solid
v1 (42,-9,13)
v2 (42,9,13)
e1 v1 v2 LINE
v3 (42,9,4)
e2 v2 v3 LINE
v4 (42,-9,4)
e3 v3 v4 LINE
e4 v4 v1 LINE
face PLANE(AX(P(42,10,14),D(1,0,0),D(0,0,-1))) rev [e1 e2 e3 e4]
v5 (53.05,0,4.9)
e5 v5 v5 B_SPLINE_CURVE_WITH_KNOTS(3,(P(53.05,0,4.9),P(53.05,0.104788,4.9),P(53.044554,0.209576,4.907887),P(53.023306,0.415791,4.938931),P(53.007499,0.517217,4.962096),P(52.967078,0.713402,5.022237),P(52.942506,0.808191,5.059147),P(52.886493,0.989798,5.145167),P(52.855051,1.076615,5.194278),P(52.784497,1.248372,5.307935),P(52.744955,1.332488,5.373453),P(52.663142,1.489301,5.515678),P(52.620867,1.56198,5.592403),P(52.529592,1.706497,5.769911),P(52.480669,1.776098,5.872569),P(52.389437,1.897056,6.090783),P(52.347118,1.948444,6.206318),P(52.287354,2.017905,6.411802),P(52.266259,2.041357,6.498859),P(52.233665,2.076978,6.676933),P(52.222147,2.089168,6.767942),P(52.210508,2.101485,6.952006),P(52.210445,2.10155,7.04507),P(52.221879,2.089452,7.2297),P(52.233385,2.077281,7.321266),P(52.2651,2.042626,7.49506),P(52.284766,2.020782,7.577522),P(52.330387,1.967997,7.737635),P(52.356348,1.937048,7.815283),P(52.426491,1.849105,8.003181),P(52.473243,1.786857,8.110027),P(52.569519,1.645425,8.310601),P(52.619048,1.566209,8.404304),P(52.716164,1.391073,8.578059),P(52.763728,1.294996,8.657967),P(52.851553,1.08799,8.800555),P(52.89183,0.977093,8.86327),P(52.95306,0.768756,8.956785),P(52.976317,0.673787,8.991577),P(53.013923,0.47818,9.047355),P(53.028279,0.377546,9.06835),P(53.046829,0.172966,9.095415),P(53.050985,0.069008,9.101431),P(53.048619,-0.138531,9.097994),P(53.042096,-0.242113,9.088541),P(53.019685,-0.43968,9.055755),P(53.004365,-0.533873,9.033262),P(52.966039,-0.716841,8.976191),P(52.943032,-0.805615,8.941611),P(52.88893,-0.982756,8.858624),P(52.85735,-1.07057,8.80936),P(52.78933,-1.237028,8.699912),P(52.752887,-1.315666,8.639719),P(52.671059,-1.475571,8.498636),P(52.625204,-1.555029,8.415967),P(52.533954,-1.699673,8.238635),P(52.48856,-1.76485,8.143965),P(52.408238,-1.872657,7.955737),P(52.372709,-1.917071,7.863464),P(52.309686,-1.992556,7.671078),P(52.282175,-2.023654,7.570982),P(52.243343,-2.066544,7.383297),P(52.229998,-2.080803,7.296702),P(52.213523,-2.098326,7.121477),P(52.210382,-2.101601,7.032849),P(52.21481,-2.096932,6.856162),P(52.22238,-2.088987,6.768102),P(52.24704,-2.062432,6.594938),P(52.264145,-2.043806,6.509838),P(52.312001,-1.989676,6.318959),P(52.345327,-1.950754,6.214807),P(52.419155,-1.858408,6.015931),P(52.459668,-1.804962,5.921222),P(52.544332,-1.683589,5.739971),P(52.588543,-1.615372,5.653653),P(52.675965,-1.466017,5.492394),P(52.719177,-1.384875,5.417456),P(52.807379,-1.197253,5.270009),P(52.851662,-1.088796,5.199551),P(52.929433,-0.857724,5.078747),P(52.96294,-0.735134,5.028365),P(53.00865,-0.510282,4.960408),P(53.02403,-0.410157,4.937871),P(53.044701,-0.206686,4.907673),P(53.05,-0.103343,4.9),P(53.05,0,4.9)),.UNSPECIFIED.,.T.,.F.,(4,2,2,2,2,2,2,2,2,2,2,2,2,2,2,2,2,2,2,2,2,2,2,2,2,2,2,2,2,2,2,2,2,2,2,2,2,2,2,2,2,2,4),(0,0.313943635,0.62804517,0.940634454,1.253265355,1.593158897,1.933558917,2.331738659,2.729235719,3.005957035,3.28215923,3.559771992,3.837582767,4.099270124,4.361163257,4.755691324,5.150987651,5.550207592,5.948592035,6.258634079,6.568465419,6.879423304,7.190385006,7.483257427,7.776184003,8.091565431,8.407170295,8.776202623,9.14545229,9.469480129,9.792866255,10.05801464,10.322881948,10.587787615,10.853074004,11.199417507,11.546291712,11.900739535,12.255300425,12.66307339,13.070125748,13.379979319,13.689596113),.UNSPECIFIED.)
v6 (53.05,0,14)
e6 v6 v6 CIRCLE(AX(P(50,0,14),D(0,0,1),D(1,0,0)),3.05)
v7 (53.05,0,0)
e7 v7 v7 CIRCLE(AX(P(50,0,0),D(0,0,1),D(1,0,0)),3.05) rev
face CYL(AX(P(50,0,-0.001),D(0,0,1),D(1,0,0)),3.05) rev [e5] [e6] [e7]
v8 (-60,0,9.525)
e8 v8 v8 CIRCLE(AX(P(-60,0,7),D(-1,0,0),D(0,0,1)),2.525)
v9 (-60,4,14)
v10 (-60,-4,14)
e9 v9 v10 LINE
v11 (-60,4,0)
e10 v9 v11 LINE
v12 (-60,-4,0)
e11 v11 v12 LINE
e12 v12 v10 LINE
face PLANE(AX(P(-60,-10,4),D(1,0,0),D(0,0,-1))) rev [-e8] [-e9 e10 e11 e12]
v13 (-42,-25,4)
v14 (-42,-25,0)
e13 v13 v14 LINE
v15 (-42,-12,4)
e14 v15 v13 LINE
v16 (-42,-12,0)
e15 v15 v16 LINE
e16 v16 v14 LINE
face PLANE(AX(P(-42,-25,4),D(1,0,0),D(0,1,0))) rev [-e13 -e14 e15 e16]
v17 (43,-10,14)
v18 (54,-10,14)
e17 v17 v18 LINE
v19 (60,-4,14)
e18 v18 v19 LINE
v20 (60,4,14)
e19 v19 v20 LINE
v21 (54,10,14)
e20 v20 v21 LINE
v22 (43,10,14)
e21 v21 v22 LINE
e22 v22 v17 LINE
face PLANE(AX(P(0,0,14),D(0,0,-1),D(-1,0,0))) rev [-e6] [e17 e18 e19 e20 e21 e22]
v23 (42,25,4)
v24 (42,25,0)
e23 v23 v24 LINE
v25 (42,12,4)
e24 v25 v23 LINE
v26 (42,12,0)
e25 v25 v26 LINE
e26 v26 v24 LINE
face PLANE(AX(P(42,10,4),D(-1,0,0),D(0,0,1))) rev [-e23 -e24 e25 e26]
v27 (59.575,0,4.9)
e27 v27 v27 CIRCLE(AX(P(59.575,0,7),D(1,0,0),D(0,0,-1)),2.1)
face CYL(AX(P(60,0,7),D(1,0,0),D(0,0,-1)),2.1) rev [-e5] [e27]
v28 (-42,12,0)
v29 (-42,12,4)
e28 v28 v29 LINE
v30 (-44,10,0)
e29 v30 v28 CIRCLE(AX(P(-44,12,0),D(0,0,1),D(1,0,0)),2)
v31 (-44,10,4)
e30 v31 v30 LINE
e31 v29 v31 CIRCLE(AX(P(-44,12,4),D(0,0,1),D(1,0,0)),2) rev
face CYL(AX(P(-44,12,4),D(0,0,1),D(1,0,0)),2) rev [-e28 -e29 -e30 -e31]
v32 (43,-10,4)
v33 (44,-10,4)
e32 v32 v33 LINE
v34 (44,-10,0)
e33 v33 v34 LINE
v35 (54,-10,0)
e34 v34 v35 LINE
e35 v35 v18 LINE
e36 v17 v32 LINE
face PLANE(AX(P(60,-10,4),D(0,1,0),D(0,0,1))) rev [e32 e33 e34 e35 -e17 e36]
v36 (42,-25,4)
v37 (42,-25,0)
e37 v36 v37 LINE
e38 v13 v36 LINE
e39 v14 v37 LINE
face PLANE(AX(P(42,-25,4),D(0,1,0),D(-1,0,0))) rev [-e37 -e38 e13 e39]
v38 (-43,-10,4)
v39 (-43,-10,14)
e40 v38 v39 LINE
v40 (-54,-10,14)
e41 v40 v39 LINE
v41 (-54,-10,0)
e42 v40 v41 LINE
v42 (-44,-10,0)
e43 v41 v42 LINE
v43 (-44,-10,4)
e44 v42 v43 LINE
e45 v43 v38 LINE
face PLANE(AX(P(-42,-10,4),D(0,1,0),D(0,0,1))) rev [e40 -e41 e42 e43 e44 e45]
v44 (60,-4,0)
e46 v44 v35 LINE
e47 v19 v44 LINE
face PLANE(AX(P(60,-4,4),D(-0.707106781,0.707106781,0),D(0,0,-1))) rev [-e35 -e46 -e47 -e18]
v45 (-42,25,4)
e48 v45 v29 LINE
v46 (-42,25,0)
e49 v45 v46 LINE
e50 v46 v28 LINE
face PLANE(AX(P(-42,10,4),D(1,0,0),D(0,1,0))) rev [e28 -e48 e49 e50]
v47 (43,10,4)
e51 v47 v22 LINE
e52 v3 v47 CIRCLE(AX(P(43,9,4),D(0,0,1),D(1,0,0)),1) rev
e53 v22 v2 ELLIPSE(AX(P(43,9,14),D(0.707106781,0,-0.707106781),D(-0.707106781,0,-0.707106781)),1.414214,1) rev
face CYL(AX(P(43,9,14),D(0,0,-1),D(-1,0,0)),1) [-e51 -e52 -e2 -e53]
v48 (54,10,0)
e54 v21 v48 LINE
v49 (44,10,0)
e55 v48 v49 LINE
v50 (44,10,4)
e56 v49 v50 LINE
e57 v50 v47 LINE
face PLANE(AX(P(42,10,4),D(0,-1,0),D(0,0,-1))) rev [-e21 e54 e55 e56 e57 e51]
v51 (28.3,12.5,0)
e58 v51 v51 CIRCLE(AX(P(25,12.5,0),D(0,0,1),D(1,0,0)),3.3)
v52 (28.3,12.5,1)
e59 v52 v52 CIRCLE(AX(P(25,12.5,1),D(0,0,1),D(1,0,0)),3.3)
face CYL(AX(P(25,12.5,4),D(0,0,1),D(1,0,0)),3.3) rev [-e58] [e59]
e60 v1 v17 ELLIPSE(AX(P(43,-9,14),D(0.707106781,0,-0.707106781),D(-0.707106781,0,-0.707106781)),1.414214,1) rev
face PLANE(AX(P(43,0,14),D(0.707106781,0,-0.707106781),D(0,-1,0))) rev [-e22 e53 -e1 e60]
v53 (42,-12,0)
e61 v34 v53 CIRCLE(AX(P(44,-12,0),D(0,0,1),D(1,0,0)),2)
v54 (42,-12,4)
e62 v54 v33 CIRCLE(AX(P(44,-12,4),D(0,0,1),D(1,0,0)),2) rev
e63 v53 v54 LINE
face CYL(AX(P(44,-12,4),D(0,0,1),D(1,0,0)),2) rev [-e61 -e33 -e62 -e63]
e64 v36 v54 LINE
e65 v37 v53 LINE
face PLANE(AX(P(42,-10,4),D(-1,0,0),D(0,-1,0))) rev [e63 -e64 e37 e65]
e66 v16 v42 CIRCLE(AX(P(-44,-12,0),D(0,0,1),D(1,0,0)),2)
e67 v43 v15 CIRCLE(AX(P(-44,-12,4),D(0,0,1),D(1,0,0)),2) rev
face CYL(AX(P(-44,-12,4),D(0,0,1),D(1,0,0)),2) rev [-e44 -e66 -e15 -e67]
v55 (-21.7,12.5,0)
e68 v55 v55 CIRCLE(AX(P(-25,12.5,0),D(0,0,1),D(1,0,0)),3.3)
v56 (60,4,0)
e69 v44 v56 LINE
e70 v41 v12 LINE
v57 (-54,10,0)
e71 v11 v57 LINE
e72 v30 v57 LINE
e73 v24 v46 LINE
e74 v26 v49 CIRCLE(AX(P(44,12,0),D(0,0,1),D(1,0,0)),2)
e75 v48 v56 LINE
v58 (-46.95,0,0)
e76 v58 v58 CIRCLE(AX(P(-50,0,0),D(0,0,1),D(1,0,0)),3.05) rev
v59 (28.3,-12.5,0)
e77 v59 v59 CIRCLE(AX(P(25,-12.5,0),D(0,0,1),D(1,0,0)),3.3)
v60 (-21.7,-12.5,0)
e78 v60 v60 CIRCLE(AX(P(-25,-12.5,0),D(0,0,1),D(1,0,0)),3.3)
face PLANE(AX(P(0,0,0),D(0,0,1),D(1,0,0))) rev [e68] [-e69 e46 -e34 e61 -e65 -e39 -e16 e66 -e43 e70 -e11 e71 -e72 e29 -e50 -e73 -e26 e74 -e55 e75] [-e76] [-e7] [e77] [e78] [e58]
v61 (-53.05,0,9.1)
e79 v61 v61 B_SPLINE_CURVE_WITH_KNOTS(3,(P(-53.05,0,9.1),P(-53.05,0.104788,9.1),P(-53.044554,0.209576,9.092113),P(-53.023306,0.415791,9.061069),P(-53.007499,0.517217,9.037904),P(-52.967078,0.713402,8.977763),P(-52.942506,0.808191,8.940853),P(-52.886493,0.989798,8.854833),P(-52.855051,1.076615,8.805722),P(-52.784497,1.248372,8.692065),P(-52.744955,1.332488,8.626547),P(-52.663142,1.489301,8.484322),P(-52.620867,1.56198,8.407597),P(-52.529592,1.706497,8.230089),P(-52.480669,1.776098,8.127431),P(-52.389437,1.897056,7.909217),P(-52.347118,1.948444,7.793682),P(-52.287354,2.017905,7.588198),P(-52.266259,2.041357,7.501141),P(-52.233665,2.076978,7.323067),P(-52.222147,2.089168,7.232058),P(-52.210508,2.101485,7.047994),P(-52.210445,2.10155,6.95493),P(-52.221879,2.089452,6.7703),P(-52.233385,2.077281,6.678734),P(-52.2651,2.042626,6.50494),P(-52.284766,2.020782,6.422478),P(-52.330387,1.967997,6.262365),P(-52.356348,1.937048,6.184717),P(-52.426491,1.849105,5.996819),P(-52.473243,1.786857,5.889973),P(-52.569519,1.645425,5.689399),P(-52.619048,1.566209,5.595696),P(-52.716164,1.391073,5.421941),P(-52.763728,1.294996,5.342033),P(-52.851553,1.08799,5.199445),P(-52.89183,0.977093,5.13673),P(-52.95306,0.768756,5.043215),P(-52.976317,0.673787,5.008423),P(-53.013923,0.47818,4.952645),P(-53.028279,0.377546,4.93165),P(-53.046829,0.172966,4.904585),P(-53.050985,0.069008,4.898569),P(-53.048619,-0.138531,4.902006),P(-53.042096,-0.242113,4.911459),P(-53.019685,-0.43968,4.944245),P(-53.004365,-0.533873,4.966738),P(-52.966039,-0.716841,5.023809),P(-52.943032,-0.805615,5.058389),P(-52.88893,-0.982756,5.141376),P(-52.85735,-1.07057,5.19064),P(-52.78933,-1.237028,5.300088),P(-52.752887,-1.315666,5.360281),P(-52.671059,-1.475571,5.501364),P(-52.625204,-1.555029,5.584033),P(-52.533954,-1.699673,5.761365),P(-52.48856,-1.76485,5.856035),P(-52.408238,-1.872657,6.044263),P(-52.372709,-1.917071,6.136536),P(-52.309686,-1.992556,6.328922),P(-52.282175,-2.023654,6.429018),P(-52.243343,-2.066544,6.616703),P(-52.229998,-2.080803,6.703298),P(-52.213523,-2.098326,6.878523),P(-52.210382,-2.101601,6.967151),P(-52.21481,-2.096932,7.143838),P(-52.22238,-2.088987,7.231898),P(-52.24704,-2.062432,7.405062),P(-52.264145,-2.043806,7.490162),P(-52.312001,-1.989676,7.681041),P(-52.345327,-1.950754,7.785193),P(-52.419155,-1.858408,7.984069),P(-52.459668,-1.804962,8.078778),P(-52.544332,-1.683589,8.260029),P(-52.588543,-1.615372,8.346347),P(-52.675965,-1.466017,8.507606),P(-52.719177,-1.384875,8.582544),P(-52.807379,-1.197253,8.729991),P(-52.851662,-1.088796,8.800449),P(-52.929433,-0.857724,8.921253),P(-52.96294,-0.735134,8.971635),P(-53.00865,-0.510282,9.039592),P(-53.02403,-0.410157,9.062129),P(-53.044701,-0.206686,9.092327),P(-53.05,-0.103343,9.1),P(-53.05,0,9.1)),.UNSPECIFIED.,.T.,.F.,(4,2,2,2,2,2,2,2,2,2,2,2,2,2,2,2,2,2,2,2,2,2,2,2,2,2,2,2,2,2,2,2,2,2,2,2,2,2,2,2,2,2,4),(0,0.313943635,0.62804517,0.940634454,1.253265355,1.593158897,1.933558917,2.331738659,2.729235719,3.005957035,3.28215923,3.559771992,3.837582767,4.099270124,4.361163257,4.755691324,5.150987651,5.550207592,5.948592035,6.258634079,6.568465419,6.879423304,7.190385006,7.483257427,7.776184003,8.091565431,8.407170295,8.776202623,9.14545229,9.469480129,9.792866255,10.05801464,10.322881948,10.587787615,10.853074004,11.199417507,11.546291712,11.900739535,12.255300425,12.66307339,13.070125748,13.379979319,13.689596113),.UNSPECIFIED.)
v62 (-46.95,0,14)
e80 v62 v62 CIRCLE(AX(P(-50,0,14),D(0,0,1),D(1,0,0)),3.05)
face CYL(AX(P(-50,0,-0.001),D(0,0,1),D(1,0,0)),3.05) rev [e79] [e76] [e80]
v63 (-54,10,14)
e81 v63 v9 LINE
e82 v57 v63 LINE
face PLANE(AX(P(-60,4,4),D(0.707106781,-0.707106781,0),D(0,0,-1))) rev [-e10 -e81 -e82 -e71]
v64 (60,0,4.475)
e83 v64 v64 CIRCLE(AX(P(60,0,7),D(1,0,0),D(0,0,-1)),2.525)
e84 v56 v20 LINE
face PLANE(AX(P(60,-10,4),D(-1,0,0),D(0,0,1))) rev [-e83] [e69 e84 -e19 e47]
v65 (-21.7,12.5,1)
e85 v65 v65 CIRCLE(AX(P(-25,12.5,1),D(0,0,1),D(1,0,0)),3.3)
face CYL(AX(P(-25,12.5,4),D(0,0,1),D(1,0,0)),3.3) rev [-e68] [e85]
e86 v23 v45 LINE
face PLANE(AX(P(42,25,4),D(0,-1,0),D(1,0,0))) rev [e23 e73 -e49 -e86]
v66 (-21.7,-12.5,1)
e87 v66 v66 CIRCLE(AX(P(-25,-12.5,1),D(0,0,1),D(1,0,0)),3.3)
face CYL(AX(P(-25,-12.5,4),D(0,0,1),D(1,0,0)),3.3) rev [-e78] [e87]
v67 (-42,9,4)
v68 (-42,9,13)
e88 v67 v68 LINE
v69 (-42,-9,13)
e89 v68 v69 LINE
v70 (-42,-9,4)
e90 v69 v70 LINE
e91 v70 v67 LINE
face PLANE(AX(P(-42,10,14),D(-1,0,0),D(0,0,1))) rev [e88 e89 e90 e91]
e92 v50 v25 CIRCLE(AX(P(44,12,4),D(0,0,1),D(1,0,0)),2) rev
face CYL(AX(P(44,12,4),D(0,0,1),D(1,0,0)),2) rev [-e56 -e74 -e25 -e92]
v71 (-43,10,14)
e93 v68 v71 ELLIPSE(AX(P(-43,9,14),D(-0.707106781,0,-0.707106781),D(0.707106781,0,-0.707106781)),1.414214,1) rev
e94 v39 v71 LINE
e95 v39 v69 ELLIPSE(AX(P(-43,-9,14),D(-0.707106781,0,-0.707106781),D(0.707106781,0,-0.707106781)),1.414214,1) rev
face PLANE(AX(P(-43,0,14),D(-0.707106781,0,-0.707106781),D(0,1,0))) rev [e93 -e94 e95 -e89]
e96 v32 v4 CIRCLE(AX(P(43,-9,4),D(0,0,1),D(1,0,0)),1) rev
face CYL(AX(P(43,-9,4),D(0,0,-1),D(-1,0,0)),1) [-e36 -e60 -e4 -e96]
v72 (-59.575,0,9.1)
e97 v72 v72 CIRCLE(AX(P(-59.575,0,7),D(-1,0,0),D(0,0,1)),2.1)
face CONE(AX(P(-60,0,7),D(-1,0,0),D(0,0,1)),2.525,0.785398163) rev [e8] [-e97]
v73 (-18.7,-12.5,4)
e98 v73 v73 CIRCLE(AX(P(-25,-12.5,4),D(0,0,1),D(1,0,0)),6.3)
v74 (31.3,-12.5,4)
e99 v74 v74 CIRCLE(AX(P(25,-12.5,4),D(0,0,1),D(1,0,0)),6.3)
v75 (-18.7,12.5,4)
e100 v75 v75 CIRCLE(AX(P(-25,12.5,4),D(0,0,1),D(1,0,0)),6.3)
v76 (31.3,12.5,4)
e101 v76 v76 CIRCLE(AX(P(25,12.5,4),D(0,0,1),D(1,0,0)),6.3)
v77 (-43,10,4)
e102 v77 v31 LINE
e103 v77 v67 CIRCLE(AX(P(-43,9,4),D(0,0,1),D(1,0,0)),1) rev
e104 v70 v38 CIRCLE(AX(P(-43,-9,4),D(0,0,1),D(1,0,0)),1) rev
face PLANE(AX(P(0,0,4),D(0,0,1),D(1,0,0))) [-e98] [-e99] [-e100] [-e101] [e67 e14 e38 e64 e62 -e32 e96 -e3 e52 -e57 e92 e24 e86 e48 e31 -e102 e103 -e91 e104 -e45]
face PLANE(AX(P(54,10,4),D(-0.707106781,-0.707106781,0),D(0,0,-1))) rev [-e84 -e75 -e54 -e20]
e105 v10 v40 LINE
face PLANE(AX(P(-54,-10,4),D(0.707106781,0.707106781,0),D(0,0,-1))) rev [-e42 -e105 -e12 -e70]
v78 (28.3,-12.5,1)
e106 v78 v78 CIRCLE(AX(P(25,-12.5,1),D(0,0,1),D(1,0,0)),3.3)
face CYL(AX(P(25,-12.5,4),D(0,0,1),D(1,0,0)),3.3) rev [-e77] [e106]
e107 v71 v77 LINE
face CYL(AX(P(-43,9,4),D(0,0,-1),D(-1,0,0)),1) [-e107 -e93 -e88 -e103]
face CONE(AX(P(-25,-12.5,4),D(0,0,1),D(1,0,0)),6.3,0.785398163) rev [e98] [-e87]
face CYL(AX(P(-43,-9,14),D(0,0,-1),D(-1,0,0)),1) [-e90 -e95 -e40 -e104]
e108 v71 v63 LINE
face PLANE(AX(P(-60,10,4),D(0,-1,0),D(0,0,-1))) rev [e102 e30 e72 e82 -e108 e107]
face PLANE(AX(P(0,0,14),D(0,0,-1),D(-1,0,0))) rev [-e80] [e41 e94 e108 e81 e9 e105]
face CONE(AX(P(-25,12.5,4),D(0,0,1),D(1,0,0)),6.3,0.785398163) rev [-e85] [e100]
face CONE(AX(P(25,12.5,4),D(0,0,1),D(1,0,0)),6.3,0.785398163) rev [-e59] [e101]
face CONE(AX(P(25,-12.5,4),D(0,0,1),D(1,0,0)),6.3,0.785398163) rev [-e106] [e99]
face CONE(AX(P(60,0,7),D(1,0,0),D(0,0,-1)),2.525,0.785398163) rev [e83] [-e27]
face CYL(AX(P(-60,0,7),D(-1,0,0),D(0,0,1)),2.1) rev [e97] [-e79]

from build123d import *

# Parameters (mm, degrees)
BOSS_EXTRUDE1_DEPTH                          = 4
CSK_FOR_M6_COUNTERSUNK_FLAT_HEAD_SCR_2_COUNT = 2
CSK_FOR_M6_COUNTERSUNK_FLAT_HEAD_SCR_2_PITCH = 25
CSK_FOR_M6_COUNTERSUNK_FLAT_HEAD_SCR_3_COUNT = 2
CSK_FOR_M6_COUNTERSUNK_FLAT_HEAD_SCR_3_PITCH = 55.901699437
CSK_FOR_M6_COUNTERSUNK_FLAT_HEAD_SCR_4_COUNT = 2
CSK_FOR_M6_COUNTERSUNK_FLAT_HEAD_SCR_4_PITCH = 50
SKETCH11_W                                   = 18
SKETCH11_H                                   = 20
BOSS_EXTRUDE4_DEPTH                          = 10
CHAMFER1_SIZE                                = 6
CUT_EXTRUDE5_REACH                           = 68.491
SKETCH12_R                                   = 3.05
FILLET2_R                                    = 2
CHAMFER2_SIZE                                = 1
FILLET3_R                                    = 1


# Read off the part's stored shape, not the designer's step: M5 Tapped Hole1
with BuildPart() as part:
    # Sketch1 → Boss-Extrude1 (new body)
    with BuildSketch(Plane.XY):
        Polygon((42, -25), (-42, -25), (-42, -10), (-60, -10), (-60, 10), (-42, 10), (-42, 25), (42, 25), (42, 10), (60, 10), (60, -10), (42, -10), align=None)
    extrude(amount=BOSS_EXTRUDE1_DEPTH)

    # Sketch10 → CSK for M6 Countersunk Flat Head Screw3 (revolve, cut)
    with BuildSketch(Plane(origin=(25, 12.5, 4), x_dir=(0, -1, 0), z_dir=(1, 0, 0))):
        Polygon((0, 0), (0, 4), (3.3, 4), (3.3, 3), (6.3, 0), align=None)
    csk_for_m6_countersunk_flat_head_screw3 = revolve(axis=Axis((25, 12.5, 10.35), (0, 0, -1)), mode=Mode.SUBTRACT)

    # CSK for M6 Countersunk Flat Head Scr 2: CSK for M6 Countersunk Flat Head Screw3 ×2
    with Locations(*[(0, -i * CSK_FOR_M6_COUNTERSUNK_FLAT_HEAD_SCR_2_PITCH, 0) for i in range(1, CSK_FOR_M6_COUNTERSUNK_FLAT_HEAD_SCR_2_COUNT)]):
        add(csk_for_m6_countersunk_flat_head_screw3, mode=Mode.SUBTRACT)

    # CSK for M6 Countersunk Flat Head Scr 3: CSK for M6 Countersunk Flat Head Screw3 ×2
    with Locations(*[Vector(-0.894427190999916, -0.447213595499958, 0) * (i * CSK_FOR_M6_COUNTERSUNK_FLAT_HEAD_SCR_3_PITCH) for i in range(1, CSK_FOR_M6_COUNTERSUNK_FLAT_HEAD_SCR_3_COUNT)]):
        add(csk_for_m6_countersunk_flat_head_screw3, mode=Mode.SUBTRACT)

    # CSK for M6 Countersunk Flat Head Scr 4: CSK for M6 Countersunk Flat Head Screw3 ×2
    with Locations(*[(-i * CSK_FOR_M6_COUNTERSUNK_FLAT_HEAD_SCR_4_PITCH, 0, 0) for i in range(1, CSK_FOR_M6_COUNTERSUNK_FLAT_HEAD_SCR_4_COUNT)]):
        add(csk_for_m6_countersunk_flat_head_screw3, mode=Mode.SUBTRACT)

    # Sketch11 → Boss-Extrude4 (add)
    with BuildSketch(Plane.XY.offset(4)):
        with Locations((51, 0)):
            Rectangle(SKETCH11_W, SKETCH11_H)
        with Locations((-51, 0)):
            Rectangle(SKETCH11_W, SKETCH11_H)
    extrude(amount=BOSS_EXTRUDE4_DEPTH)

    # Chamfer1
    chamfer1_edges = [part.edges().sort_by_distance(p)[0] for p in [
        (60, 10, 7),
        (60, -10, 7),
        (-60, -10, 7),
        (-60, 10, 7),
    ]]
    chamfer(chamfer1_edges, length=CHAMFER1_SIZE)

    # Sketch12 → Cut-Extrude5 (cut, up to next)
    with BuildSketch(Plane.XY.offset(14), mode=Mode.PRIVATE) as cut_extrude5_sk1:
        with Locations((50, 0)):
            Circle(SKETCH12_R)
    cut_extrude5_tool1 = extrude(cut_extrude5_sk1.sketch, amount=-CUT_EXTRUDE5_REACH, mode=Mode.PRIVATE) & part.part
    # Sketch12 → Cut-Extrude5 (cut, up to next)
    with BuildSketch(Plane.XY.offset(14), mode=Mode.PRIVATE) as cut_extrude5_sk2:
        with Locations((-50, 0)):
            Circle(SKETCH12_R)
    cut_extrude5_tool2 = extrude(cut_extrude5_sk2.sketch, amount=-CUT_EXTRUDE5_REACH, mode=Mode.PRIVATE) & part.part
    add(cut_extrude5_tool1.solids().sort_by_distance((50, 0, 14))[0], mode=Mode.SUBTRACT)
    add(cut_extrude5_tool2.solids().sort_by_distance((-50, 0, 14))[0], mode=Mode.SUBTRACT)

    # Fillet2
    fillet2_edges = [part.edges().sort_by_distance(p)[0] for p in [
        (42, 10, 2),
        (42, -10, 2),
        (-42, -10, 2),
        (-42, 10, 2),
    ]]
    fillet(fillet2_edges, radius=FILLET2_R)

    # Chamfer2
    chamfer2_edges = [part.edges().sort_by_distance(p)[0] for p in [
        (42, 0, 14),
        (-42, 0, 14),
    ]]
    chamfer(chamfer2_edges, length=CHAMFER2_SIZE)

    # Fillet3
    fillet3_edges = [part.edges().sort_by_distance(p)[0] for p in [
        (42, 10, 8.5),
        (42, -10, 8.5),
        (-42, 10, 8.5),
        (-42, -10, 8.5),
    ]]
    fillet(fillet3_edges, radius=FILLET3_R)

    # M5 Tapped Hole1 outline → M5 Tapped Hole1 (revolve, cut)
    with BuildSketch(Plane.YX.offset(-7)):
        Polygon((2.1, -59.575), (2.1, -52.211448723), (0, -52.211448723), (0, -60), (2.525, -60), align=None)
        Polygon((0, 52.211448731), (2.1, 52.211448731), (2.1, 59.575), (2.525, 60), (0, 60), align=None)
    revolve(axis=Axis((0, 0, 7), (1, 0, 0)), mode=Mode.SUBTRACT)


solid = part.part
